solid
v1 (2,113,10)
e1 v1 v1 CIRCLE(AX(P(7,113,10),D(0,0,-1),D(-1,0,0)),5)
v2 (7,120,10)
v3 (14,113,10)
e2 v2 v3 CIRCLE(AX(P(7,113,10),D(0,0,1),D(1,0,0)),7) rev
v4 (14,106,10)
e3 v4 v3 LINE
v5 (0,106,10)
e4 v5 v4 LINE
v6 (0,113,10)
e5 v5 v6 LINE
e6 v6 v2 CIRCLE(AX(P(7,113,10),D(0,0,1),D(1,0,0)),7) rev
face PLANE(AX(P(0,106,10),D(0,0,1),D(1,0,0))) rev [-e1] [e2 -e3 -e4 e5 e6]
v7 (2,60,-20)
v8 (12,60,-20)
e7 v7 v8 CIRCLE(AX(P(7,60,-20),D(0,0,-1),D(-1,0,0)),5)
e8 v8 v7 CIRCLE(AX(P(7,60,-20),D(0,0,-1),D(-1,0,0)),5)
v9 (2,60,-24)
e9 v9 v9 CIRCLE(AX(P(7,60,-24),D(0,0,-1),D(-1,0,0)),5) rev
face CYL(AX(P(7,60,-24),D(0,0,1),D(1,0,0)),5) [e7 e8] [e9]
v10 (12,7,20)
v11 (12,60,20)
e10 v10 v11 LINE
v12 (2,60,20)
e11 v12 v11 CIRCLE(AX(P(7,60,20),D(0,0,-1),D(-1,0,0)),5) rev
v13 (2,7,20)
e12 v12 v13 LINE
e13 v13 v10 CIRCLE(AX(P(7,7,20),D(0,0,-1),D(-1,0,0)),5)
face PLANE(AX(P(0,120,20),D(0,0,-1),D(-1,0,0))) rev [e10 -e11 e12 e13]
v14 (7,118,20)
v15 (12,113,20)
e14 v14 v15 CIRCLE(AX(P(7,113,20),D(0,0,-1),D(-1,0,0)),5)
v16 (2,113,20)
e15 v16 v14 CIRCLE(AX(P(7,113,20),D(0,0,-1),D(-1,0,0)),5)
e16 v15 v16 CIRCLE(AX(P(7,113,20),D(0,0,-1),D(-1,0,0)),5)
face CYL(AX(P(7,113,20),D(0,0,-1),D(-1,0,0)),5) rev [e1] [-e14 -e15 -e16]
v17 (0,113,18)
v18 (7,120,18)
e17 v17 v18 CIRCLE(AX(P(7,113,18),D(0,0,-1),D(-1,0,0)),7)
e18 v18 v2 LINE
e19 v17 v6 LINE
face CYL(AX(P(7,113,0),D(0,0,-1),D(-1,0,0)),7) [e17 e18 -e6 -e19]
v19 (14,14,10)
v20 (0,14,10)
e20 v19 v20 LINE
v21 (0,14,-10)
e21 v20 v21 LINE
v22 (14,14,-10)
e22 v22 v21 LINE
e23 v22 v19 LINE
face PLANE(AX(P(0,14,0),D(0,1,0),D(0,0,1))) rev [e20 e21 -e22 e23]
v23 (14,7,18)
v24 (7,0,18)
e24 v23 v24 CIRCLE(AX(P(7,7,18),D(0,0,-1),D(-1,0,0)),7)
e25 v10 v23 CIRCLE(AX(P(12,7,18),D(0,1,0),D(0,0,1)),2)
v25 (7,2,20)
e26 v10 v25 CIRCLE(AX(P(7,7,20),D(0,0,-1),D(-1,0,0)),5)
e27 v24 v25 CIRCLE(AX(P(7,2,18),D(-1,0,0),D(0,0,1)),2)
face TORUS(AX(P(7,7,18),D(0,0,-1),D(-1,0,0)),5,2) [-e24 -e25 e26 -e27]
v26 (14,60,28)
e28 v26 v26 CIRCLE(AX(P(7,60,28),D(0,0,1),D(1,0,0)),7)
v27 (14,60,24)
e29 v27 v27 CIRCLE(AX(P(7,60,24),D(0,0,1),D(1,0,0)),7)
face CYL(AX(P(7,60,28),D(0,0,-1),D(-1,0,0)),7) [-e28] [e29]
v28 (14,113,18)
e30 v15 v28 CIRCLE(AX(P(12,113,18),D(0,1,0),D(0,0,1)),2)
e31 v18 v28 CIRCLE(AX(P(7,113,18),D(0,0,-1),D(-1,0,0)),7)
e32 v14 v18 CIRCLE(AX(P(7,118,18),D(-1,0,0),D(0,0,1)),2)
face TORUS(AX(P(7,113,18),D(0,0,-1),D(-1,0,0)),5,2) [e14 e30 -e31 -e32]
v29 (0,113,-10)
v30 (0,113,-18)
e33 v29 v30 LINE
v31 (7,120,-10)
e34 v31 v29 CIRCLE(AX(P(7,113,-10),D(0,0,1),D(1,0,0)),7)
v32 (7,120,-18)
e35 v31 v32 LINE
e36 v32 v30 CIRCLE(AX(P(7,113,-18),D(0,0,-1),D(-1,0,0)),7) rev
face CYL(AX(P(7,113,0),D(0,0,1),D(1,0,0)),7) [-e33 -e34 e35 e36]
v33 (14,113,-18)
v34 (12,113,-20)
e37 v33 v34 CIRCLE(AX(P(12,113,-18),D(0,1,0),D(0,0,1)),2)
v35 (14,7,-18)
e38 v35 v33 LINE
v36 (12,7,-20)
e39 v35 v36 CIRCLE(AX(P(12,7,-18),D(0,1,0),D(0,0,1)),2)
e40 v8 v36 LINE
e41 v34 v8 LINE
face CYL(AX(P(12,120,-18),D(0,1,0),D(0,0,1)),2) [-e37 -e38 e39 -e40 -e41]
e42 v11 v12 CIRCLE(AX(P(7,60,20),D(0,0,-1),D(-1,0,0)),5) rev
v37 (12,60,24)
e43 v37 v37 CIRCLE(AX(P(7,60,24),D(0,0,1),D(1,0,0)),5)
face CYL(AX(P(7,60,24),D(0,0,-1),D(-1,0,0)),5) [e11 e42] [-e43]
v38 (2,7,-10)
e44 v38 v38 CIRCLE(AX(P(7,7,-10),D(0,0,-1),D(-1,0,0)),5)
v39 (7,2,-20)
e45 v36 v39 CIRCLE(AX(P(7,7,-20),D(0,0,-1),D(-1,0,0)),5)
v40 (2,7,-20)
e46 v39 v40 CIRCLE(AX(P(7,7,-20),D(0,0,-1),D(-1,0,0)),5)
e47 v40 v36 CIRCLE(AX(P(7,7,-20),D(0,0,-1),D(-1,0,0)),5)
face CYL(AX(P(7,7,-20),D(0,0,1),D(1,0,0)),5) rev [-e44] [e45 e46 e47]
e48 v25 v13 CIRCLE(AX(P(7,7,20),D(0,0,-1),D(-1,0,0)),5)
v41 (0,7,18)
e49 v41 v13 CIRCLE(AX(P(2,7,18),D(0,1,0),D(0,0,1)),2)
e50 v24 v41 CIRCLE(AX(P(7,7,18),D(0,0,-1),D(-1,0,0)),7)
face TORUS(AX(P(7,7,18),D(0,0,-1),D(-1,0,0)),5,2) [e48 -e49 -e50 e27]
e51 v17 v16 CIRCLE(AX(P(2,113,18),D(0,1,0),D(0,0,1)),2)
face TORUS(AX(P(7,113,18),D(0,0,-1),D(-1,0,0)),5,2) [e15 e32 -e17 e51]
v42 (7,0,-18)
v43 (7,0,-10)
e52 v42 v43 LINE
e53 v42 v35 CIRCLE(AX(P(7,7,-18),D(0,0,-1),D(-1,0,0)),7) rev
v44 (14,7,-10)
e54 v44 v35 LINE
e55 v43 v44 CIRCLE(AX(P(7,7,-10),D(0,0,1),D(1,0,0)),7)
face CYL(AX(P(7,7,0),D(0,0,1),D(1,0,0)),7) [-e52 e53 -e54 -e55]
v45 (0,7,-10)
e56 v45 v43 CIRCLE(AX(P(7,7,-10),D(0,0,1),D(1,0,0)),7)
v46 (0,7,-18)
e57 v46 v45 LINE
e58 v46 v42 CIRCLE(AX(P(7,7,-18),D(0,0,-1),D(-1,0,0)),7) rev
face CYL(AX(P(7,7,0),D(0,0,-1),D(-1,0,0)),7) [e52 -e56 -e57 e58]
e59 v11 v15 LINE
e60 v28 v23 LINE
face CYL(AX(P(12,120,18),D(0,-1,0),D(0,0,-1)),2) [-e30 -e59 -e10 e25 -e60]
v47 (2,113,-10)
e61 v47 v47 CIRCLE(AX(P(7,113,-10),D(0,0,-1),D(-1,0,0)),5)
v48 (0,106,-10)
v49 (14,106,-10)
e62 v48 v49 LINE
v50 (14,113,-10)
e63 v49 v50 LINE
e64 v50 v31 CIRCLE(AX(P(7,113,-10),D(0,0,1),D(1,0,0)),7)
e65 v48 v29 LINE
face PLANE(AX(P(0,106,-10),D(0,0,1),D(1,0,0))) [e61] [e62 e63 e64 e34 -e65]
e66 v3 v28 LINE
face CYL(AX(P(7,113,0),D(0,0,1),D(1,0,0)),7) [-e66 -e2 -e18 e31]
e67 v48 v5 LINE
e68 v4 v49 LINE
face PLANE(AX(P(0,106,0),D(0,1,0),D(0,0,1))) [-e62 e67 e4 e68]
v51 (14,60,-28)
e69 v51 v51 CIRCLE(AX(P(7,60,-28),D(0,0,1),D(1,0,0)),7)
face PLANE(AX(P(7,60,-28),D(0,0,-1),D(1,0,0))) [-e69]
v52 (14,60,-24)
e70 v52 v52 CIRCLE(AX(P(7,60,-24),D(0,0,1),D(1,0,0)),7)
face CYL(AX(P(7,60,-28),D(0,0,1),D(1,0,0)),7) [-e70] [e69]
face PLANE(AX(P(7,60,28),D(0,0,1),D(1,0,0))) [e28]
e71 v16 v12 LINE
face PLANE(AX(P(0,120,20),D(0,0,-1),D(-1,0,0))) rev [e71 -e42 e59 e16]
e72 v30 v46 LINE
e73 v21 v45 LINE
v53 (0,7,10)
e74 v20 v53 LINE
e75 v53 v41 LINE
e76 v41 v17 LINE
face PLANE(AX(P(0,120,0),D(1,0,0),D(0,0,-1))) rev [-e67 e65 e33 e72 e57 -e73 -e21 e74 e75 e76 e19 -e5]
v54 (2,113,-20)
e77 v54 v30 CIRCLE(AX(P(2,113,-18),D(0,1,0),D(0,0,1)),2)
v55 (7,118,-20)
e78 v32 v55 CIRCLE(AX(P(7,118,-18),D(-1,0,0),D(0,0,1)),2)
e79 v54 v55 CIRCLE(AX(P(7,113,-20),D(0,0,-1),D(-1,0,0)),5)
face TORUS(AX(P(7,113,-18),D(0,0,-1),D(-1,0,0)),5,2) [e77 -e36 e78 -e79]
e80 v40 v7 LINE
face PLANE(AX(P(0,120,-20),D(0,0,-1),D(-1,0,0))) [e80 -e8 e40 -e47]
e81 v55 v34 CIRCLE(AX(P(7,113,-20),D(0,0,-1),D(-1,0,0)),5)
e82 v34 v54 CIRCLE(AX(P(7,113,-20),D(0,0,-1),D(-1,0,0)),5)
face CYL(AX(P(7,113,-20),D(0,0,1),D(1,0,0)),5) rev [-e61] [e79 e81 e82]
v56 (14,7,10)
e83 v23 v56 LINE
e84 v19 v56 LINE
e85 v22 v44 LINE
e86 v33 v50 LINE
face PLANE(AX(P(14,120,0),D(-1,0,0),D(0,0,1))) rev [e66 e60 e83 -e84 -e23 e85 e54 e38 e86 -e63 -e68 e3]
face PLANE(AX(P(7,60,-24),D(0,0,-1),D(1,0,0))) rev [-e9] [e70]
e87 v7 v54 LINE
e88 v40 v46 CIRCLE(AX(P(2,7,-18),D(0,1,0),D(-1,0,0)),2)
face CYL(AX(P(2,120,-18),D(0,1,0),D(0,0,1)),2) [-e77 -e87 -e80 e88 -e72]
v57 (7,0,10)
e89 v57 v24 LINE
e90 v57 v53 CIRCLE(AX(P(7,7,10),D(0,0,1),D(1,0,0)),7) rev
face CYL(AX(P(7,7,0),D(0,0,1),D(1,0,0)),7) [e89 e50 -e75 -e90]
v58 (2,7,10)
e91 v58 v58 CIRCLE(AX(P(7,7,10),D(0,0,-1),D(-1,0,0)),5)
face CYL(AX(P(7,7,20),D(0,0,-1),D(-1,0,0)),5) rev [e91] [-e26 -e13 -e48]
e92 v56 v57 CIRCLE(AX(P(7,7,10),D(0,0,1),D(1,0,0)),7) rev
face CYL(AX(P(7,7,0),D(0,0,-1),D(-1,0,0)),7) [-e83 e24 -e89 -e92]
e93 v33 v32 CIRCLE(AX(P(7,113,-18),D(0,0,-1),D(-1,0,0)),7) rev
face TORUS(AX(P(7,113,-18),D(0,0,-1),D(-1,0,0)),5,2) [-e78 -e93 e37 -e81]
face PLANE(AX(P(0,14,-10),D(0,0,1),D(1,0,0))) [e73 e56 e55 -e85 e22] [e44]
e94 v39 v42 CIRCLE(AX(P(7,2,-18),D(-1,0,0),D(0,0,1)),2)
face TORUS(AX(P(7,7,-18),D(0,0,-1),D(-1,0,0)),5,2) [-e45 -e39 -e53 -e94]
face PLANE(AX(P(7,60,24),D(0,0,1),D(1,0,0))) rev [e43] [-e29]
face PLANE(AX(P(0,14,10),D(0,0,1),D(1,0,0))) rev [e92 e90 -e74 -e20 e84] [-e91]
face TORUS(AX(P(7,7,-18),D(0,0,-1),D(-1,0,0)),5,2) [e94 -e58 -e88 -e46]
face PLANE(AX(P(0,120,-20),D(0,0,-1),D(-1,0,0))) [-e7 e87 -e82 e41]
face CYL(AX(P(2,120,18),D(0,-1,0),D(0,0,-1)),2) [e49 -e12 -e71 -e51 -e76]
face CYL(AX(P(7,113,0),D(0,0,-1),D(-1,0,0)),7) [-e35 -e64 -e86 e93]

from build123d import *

# Parameters (mm, degrees)
SKETCH1_W           = 14
SKETCH1_H           = 20
BOSS_EXTRUDE1_DEPTH = 120
SKETCH2_W           = 14
SKETCH2_H           = 10
CUT_EXTRUDE1_DEPTH  = 14
SKETCH5_R           = 5
CUT_EXTRUDE4_DEPTH  = 10
SKETCH4_W           = 14
SKETCH4_H           = 10
CUT_EXTRUDE3_DEPTH  = 14
SKETCH6_R           = 5
CUT_EXTRUDE5_DEPTH  = 10
FILLET3_R           = 7
SKETCH7_R           = 5
BOSS_EXTRUDE2_DEPTH = 4
SKETCH8_R           = 7
BOSS_EXTRUDE3_DEPTH = 4
FILLET4_R           = 2


with BuildPart() as part:
    # Sketch1 → Boss-Extrude1 (new body)
    with BuildSketch(Plane(origin=(0, 0, 0), x_dir=(1, 0, 0), z_dir=(0, 1, 0))):
        with Locations((7, -10)):
            Rectangle(SKETCH1_W, SKETCH1_H)
    boss_extrude1 = extrude(amount=BOSS_EXTRUDE1_DEPTH)

    # Sketch2 → Cut-Extrude1 (cut)
    with BuildSketch(Plane.XZ):
        with Locations((7, 5)):
            Rectangle(SKETCH2_W, SKETCH2_H)
    cut_extrude1 = extrude(amount=-CUT_EXTRUDE1_DEPTH, mode=Mode.SUBTRACT)

    # Sketch5 → Cut-Extrude4 (cut)
    with BuildSketch(Plane(origin=(0, 0, 10), x_dir=(-1, 0, 0), z_dir=(0, 0, -1))):
        with Locations((-7, 7)):
            Circle(SKETCH5_R)
    cut_extrude4 = extrude(amount=-CUT_EXTRUDE4_DEPTH, mode=Mode.SUBTRACT)

    # Sketch4 → Cut-Extrude3 (cut)
    with BuildSketch(Plane(origin=(0, 120, 0), x_dir=(1, 0, 0), z_dir=(0, 1, 0))):
        with Locations((7, -5)):
            Rectangle(SKETCH4_W, SKETCH4_H)
    cut_extrude3 = extrude(amount=-CUT_EXTRUDE3_DEPTH, mode=Mode.SUBTRACT)

    # Sketch6 → Cut-Extrude5 (cut)
    with BuildSketch(Plane(origin=(0, 0, 10), x_dir=(-1, 0, 0), z_dir=(0, 0, -1))):
        with Locations((-7, 113)):
            Circle(SKETCH6_R)
    cut_extrude5 = extrude(amount=-CUT_EXTRUDE5_DEPTH, mode=Mode.SUBTRACT)

    # Mirror1: Boss-Extrude1, Cut-Extrude1, Cut-Extrude4, Cut-Extrude3, Cut-Extrude5 across plane
    add(boss_extrude1.mirror(Plane(origin=(0, 120, 0), x_dir=(1, 0, 0), z_dir=(0, 0, 1))))
    add(cut_extrude1.mirror(Plane(origin=(0, 120, 0), x_dir=(1, 0, 0), z_dir=(0, 0, 1))), mode=Mode.SUBTRACT)
    add(cut_extrude4.mirror(Plane(origin=(0, 120, 0), x_dir=(1, 0, 0), z_dir=(0, 0, 1))), mode=Mode.SUBTRACT)
    add(cut_extrude3.mirror(Plane(origin=(0, 120, 0), x_dir=(1, 0, 0), z_dir=(0, 0, 1))), mode=Mode.SUBTRACT)
    add(cut_extrude5.mirror(Plane(origin=(0, 120, 0), x_dir=(1, 0, 0), z_dir=(0, 0, 1))), mode=Mode.SUBTRACT)

    # Fillet3
    fillet3_edges = [part.edges().sort_by_distance(p)[0] for p in [
        (0, 120, -15),
        (14, 120, -15),
        (0, 120, 15),
        (14, 120, 15),
        (0, 0, -15),
        (14, 0, -15),
        (0, 0, 15),
        (14, 0, 15),
    ]]
    fillet(fillet3_edges, radius=FILLET3_R - 0.0001)  # a hair under: the kernel refuses the full size

    # Sketch7 → Boss-Extrude2 (add)
    with BuildSketch(Plane.XY.offset(20)):
        with Locations(Location((7, 60, 0), (0, 0, 180))):
            Circle(SKETCH7_R)
    boss_extrude2 = extrude(amount=BOSS_EXTRUDE2_DEPTH)

    # Sketch8 → Boss-Extrude3 (add)
    with BuildSketch(Plane.XY.offset(24)):
        with Locations((7, 60)):
            Circle(SKETCH8_R)
    boss_extrude3 = extrude(amount=BOSS_EXTRUDE3_DEPTH)

    # Mirror2: Boss-Extrude2, Boss-Extrude3 across plane
    add(boss_extrude2.mirror(Plane.XY))
    add(boss_extrude3.mirror(Plane.XY))

    # Fillet4
    fillet4_edges = [part.edges().sort_by_distance(p)[0] for p in [
        (0, 60, -20),
        (0, 60, 20),
        (14, 60, -20),
        (11.949776758, 2.050223242, -20),
        (2.050223242, 2.050223242, -20),
        (11.949776758, 117.949776758, -20),
        (2.050223242, 117.949776758, -20),
        (14, 60, 20),
        (11.949776758, 2.050223242, 20),
        (2.050223242, 2.050223242, 20),
        (11.949776758, 117.949776758, 20),
        (2.050223242, 117.949776758, 20),
    ]]
    fillet(fillet4_edges, radius=FILLET4_R - 0.0001)  # a hair under: the kernel refuses the full size


solid = part.part
